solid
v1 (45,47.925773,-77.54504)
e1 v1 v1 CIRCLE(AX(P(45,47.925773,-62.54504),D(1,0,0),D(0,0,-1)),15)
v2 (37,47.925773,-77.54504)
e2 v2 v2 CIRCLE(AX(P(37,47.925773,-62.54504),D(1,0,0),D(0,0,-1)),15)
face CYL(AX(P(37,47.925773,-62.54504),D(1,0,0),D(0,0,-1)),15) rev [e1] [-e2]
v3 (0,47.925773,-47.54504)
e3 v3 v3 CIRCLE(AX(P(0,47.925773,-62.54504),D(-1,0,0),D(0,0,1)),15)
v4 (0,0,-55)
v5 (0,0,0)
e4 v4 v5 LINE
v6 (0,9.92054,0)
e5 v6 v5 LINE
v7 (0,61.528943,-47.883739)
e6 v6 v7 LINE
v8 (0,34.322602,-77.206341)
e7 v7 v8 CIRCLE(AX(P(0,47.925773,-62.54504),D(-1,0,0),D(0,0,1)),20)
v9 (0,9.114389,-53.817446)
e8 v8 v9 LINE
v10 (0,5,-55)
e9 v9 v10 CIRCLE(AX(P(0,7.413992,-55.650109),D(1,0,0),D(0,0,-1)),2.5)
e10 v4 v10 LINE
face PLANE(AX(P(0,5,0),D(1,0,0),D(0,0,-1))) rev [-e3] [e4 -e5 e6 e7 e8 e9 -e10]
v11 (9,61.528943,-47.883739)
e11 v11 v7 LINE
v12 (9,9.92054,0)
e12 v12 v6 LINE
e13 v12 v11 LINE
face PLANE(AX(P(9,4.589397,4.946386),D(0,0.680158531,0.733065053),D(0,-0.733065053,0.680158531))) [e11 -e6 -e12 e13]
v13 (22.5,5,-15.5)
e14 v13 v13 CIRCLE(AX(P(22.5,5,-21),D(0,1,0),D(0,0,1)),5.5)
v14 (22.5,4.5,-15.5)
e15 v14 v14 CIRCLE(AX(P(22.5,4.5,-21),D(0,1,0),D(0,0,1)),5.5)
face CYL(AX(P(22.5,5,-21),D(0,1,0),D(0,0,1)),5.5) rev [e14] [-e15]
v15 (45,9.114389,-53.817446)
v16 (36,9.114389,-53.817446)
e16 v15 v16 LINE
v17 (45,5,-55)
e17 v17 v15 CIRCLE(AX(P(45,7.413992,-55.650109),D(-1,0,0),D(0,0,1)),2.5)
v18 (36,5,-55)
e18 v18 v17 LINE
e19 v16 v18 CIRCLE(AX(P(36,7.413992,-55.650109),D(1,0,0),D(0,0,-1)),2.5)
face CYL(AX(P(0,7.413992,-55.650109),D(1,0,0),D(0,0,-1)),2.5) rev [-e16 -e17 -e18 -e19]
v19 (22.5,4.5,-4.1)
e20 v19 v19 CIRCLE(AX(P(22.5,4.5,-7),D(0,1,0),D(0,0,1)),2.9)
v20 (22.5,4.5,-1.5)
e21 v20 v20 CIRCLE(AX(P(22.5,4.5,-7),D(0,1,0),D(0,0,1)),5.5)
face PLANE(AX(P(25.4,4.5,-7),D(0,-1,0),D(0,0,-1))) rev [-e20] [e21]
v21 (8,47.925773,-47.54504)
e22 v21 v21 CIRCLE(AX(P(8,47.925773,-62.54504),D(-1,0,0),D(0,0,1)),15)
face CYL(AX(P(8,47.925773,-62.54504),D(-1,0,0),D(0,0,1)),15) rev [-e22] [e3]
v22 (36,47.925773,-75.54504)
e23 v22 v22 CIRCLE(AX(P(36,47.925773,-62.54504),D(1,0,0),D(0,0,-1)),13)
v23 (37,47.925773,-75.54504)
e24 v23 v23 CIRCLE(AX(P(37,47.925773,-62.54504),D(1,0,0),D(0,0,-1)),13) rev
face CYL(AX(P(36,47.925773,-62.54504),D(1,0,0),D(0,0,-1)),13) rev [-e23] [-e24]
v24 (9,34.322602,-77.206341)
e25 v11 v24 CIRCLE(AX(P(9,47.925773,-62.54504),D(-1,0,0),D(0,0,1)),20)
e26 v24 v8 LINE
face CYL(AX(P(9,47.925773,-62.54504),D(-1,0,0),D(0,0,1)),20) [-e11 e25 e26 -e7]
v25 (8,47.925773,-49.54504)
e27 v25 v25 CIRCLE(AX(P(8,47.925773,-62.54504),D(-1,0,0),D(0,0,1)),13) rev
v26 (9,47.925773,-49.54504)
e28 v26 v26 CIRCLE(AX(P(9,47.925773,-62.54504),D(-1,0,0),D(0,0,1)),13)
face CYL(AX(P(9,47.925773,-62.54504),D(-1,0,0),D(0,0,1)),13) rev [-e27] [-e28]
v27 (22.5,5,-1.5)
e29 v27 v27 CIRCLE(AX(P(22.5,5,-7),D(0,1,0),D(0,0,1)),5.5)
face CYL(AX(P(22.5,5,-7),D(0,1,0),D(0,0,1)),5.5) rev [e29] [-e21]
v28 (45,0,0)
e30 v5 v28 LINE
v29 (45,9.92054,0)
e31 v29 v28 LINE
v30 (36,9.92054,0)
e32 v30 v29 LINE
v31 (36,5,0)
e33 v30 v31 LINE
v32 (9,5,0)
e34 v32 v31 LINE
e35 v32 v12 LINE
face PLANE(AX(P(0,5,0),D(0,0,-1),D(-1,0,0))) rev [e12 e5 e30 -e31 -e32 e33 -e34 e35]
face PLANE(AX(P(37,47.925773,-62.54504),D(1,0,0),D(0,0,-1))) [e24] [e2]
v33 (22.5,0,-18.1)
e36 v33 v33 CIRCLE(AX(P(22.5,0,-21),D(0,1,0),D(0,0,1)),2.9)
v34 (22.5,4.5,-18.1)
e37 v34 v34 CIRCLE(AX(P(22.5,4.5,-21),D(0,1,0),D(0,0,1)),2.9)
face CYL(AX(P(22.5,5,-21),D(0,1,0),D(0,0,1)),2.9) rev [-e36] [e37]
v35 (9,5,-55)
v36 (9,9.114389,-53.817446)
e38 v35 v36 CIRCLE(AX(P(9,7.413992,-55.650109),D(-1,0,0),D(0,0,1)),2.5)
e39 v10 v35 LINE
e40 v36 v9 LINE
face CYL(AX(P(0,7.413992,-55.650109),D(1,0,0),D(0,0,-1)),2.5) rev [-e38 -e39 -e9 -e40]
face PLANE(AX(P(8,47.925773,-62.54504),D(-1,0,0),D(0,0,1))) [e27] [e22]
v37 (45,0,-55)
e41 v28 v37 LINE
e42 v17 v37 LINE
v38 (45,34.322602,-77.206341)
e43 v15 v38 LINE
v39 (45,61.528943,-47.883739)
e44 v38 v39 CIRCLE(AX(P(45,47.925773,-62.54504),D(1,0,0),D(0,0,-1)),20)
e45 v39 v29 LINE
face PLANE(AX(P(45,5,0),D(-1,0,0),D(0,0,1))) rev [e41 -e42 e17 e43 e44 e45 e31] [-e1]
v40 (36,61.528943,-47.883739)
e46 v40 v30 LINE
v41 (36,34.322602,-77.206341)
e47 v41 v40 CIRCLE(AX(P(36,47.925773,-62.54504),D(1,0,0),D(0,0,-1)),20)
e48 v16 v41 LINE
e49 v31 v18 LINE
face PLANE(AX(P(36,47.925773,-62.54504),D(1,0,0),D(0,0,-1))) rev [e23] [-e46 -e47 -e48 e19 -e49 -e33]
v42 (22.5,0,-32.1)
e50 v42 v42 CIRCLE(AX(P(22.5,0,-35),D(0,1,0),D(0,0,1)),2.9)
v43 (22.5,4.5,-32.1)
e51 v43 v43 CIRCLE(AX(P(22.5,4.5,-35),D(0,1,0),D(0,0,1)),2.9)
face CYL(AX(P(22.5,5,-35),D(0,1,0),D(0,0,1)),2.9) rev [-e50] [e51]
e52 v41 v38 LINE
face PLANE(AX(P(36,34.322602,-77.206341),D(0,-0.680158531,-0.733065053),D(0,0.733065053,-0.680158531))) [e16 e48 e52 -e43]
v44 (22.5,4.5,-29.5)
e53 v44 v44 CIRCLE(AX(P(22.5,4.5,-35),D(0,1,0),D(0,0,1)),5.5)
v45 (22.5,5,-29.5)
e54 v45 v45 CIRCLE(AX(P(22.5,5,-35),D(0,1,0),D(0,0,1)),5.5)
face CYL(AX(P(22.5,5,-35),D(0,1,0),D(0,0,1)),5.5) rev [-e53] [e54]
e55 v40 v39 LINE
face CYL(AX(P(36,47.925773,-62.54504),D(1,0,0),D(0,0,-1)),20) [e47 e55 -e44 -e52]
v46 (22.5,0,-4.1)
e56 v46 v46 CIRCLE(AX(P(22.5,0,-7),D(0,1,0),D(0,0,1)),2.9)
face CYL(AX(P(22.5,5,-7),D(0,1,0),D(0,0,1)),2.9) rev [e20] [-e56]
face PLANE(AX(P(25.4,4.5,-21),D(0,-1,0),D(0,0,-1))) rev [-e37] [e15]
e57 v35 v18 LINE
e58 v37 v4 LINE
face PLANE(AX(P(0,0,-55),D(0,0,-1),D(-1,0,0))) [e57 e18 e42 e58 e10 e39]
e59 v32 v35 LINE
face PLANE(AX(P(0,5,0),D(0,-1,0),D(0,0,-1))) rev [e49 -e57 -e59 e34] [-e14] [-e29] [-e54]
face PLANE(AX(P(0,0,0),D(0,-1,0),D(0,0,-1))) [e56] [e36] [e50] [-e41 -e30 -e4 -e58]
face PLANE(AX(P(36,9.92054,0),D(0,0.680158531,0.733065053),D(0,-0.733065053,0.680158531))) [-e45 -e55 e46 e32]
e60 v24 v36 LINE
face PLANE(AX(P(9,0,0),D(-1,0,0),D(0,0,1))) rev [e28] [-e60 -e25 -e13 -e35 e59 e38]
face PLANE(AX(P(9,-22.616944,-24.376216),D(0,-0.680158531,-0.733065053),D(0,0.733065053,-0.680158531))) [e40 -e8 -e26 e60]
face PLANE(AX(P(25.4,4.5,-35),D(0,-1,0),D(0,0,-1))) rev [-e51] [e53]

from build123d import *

# Parameters (mm, degrees)
SKETCH_1_W                  = 45
SKETCH_1_H                  = 50
EXTRUDE_1_DEPTH             = 5
EXTRUDE_2_DEPTH             = 9
EXTRUDE_START               = -9
EXTRUDE_3_DEPTH             = 9
SKETCH_4_R                  = 13
CUT_EXTRUDE_1_DEPTH         = 9
CUT_EXTRUDE_START           = -9
SKETCH_5_R                  = 13
CUT_EXTRUDE_2_DEPTH         = 9
SKETCH_6_W                  = 45
SKETCH_6_H                  = 5
EXTRUDE_4_DEPTH             = 5
FILLET_1_R                  = 2.5
HOLE_WIZARD_C_1_D           = 5.8
HOLE_WIZARD_C_1_DEPTH       = 5
HOLE_WIZARD_C_1_CBORE_D     = 11
HOLE_WIZARD_C_1_CBORE_DEPTH = 0.5
HOLE_WIZARD_C_1_TIP         = 1.742495795
SKETCH_15_R                 = 15
CUT_EXTRUDE_3_DEPTH         = 8
CUT_EXTRUDE_START_2         = -8
SKETCH_16_R                 = 15
CUT_EXTRUDE_4_DEPTH         = 8


with BuildPart() as part:
    # 草图1 → 凸台-拉伸1 (new body)
    with BuildSketch(Plane(origin=(0, 0, 0), x_dir=(1, 0, 0), z_dir=(0, 1, 0))):
        with Locations((22.5, 25)):
            Rectangle(SKETCH_1_W, SKETCH_1_H)
    extrude(amount=EXTRUDE_1_DEPTH)

    # 草图2 → 凸台-拉伸2 (add)
    with BuildSketch(Plane(origin=(45, 0, 0), x_dir=(0, 0, -1), z_dir=(1, 0, 0))):
        with BuildLine():
            Line((0, 5), (0, 9.920540101))
            Line((0, 9.920540101), (47.883739104, 61.528943381))
            ThreePointArc((47.883739104, 61.528943381), (76.148210795, 62.587073829), (77.206341243, 34.322602138))
            Line((77.206341243, 34.322602138), (50, 5))
            Line((50, 5), (0, 5))
        make_face()
    extrude(amount=-EXTRUDE_2_DEPTH)

    # 草图3 → 凸台-拉伸3 (add)
    with BuildSketch(Plane.ZY.offset(EXTRUDE_START)):
        with BuildLine():
            Line((-50, 5), (0, 5))
            Line((0, 5), (0, 9.920540101))
            Line((0, 9.920540101), (-47.883739104, 61.528943381))
            ThreePointArc((-47.883739104, 61.528943381), (-76.148210795, 62.587073829), (-77.206341243, 34.322602138))
            Line((-77.206341243, 34.322602138), (-50, 5))
        make_face()
    extrude(amount=EXTRUDE_3_DEPTH)

    # 草图4 → 切除-拉伸1 (cut)
    with BuildSketch(Plane.ZY):
        with Locations((-62.545040174, 47.92577276)):
            Circle(SKETCH_4_R)
    extrude(amount=-CUT_EXTRUDE_1_DEPTH, mode=Mode.SUBTRACT)

    # 草图5 → 切除-拉伸2 (cut)
    with BuildSketch(Plane(origin=(45, 0, 0), x_dir=(0, 0, -1), z_dir=(1, 0, 0)).offset(CUT_EXTRUDE_START)):
        with Locations(Location((62.545040174, 47.92577276, 0), (0, 0, 180))):
            Circle(SKETCH_5_R)
    extrude(amount=CUT_EXTRUDE_2_DEPTH, mode=Mode.SUBTRACT)

    # 草图6 → 凸台-拉伸4 (add)
    with BuildSketch(Plane(origin=(0, 0, -50), x_dir=(-1, 0, 0), z_dir=(0, 0, -1))):
        with Locations((-22.5, 2.5)):
            Rectangle(SKETCH_6_W, SKETCH_6_H)
    extrude(amount=EXTRUDE_4_DEPTH)

    # 圆角1
    # the kernel refuses this fillet: 2.5 mm, written as the material it adds along each edge
    with BuildSketch(Plane(origin=(9, 5, -50), x_dir=(0, 0, -1), z_dir=(-1, 0, 0))) as fillet_1_piece_1:
        with BuildLine():
            CenterArc((5.650108918, -2.413992211), FILLET_1_R, 105.072647289, 117.783385174)
            Line((3.817446285, -4.114388539), (3.780793032, -4.148396465))
            Line((3.780793032, -4.148396465), (-0.036653253, -0.034007927))
            Line((-0.036653253, -0.034007927), (0, 0.05))
            ThreePointArc((0, 0.05), (2.5, 0.05), (4.986997822, 0.048279844))
            Line((4.986997822, 0.048279844), (5, 0))
        make_face()
    extrude(amount=9)
    with BuildSketch(Plane(origin=(45, 5, -50), x_dir=(0, 0.7330650534621563, -0.6801585310738415), z_dir=(-1, 0, 0))) as fillet_1_piece_2:
        with BuildLine():
            CenterArc((5.612583111, 2.5), FILLET_1_R, 152.216614826, 117.783385174)
            Line((3.400792655, 3.665325267), (3.356556846, 3.688631773))
            ThreePointArc((3.356556846, 3.688631773), (1.663743075, 1.86667056), (-0.036653253, 0.034007927))
            Line((-0.036653253, 0.034007927), (0, -0.05))
            Line((0, -0.05), (5.612583111, -0.05))
            Line((5.612583111, -0.05), (5.612583111, 0))
        make_face()
    extrude(amount=9)

    # 打孔尺寸(%根据六角头螺)栓 C 级的类型1
    with Locations(Plane(origin=(22.5, 5, -21), x_dir=(0, 0, 1), z_dir=(0, 1, 0))):
        with Locations((0, 0), (14, 0), (-14, 0)):
            CounterBoreHole(HOLE_WIZARD_C_1_D / 2, HOLE_WIZARD_C_1_CBORE_D / 2, HOLE_WIZARD_C_1_CBORE_DEPTH, depth=HOLE_WIZARD_C_1_DEPTH)
            with Locations((0, 0, -(HOLE_WIZARD_C_1_DEPTH + HOLE_WIZARD_C_1_TIP / 2))):  # 118° drill point
                Cone(0, HOLE_WIZARD_C_1_D / 2, HOLE_WIZARD_C_1_TIP, mode=Mode.SUBTRACT)

    # 草图15 → 切除-拉伸3 (cut)
    with BuildSketch(Plane.ZY):
        with Locations((-62.545040174, 47.92577276)):
            Circle(SKETCH_15_R)
    extrude(amount=-CUT_EXTRUDE_3_DEPTH, mode=Mode.SUBTRACT)

    # 草图16 → 切除-拉伸4 (cut)
    with BuildSketch(Plane(origin=(45, 0, 0), x_dir=(0, 0, -1), z_dir=(1, 0, 0)).offset(CUT_EXTRUDE_START_2)):
        with Locations(Location((62.545040174, 47.92577276, 0), (0, 0, 180))):
            Circle(SKETCH_16_R)
    extrude(amount=CUT_EXTRUDE_4_DEPTH, mode=Mode.SUBTRACT)


solid = part.part
